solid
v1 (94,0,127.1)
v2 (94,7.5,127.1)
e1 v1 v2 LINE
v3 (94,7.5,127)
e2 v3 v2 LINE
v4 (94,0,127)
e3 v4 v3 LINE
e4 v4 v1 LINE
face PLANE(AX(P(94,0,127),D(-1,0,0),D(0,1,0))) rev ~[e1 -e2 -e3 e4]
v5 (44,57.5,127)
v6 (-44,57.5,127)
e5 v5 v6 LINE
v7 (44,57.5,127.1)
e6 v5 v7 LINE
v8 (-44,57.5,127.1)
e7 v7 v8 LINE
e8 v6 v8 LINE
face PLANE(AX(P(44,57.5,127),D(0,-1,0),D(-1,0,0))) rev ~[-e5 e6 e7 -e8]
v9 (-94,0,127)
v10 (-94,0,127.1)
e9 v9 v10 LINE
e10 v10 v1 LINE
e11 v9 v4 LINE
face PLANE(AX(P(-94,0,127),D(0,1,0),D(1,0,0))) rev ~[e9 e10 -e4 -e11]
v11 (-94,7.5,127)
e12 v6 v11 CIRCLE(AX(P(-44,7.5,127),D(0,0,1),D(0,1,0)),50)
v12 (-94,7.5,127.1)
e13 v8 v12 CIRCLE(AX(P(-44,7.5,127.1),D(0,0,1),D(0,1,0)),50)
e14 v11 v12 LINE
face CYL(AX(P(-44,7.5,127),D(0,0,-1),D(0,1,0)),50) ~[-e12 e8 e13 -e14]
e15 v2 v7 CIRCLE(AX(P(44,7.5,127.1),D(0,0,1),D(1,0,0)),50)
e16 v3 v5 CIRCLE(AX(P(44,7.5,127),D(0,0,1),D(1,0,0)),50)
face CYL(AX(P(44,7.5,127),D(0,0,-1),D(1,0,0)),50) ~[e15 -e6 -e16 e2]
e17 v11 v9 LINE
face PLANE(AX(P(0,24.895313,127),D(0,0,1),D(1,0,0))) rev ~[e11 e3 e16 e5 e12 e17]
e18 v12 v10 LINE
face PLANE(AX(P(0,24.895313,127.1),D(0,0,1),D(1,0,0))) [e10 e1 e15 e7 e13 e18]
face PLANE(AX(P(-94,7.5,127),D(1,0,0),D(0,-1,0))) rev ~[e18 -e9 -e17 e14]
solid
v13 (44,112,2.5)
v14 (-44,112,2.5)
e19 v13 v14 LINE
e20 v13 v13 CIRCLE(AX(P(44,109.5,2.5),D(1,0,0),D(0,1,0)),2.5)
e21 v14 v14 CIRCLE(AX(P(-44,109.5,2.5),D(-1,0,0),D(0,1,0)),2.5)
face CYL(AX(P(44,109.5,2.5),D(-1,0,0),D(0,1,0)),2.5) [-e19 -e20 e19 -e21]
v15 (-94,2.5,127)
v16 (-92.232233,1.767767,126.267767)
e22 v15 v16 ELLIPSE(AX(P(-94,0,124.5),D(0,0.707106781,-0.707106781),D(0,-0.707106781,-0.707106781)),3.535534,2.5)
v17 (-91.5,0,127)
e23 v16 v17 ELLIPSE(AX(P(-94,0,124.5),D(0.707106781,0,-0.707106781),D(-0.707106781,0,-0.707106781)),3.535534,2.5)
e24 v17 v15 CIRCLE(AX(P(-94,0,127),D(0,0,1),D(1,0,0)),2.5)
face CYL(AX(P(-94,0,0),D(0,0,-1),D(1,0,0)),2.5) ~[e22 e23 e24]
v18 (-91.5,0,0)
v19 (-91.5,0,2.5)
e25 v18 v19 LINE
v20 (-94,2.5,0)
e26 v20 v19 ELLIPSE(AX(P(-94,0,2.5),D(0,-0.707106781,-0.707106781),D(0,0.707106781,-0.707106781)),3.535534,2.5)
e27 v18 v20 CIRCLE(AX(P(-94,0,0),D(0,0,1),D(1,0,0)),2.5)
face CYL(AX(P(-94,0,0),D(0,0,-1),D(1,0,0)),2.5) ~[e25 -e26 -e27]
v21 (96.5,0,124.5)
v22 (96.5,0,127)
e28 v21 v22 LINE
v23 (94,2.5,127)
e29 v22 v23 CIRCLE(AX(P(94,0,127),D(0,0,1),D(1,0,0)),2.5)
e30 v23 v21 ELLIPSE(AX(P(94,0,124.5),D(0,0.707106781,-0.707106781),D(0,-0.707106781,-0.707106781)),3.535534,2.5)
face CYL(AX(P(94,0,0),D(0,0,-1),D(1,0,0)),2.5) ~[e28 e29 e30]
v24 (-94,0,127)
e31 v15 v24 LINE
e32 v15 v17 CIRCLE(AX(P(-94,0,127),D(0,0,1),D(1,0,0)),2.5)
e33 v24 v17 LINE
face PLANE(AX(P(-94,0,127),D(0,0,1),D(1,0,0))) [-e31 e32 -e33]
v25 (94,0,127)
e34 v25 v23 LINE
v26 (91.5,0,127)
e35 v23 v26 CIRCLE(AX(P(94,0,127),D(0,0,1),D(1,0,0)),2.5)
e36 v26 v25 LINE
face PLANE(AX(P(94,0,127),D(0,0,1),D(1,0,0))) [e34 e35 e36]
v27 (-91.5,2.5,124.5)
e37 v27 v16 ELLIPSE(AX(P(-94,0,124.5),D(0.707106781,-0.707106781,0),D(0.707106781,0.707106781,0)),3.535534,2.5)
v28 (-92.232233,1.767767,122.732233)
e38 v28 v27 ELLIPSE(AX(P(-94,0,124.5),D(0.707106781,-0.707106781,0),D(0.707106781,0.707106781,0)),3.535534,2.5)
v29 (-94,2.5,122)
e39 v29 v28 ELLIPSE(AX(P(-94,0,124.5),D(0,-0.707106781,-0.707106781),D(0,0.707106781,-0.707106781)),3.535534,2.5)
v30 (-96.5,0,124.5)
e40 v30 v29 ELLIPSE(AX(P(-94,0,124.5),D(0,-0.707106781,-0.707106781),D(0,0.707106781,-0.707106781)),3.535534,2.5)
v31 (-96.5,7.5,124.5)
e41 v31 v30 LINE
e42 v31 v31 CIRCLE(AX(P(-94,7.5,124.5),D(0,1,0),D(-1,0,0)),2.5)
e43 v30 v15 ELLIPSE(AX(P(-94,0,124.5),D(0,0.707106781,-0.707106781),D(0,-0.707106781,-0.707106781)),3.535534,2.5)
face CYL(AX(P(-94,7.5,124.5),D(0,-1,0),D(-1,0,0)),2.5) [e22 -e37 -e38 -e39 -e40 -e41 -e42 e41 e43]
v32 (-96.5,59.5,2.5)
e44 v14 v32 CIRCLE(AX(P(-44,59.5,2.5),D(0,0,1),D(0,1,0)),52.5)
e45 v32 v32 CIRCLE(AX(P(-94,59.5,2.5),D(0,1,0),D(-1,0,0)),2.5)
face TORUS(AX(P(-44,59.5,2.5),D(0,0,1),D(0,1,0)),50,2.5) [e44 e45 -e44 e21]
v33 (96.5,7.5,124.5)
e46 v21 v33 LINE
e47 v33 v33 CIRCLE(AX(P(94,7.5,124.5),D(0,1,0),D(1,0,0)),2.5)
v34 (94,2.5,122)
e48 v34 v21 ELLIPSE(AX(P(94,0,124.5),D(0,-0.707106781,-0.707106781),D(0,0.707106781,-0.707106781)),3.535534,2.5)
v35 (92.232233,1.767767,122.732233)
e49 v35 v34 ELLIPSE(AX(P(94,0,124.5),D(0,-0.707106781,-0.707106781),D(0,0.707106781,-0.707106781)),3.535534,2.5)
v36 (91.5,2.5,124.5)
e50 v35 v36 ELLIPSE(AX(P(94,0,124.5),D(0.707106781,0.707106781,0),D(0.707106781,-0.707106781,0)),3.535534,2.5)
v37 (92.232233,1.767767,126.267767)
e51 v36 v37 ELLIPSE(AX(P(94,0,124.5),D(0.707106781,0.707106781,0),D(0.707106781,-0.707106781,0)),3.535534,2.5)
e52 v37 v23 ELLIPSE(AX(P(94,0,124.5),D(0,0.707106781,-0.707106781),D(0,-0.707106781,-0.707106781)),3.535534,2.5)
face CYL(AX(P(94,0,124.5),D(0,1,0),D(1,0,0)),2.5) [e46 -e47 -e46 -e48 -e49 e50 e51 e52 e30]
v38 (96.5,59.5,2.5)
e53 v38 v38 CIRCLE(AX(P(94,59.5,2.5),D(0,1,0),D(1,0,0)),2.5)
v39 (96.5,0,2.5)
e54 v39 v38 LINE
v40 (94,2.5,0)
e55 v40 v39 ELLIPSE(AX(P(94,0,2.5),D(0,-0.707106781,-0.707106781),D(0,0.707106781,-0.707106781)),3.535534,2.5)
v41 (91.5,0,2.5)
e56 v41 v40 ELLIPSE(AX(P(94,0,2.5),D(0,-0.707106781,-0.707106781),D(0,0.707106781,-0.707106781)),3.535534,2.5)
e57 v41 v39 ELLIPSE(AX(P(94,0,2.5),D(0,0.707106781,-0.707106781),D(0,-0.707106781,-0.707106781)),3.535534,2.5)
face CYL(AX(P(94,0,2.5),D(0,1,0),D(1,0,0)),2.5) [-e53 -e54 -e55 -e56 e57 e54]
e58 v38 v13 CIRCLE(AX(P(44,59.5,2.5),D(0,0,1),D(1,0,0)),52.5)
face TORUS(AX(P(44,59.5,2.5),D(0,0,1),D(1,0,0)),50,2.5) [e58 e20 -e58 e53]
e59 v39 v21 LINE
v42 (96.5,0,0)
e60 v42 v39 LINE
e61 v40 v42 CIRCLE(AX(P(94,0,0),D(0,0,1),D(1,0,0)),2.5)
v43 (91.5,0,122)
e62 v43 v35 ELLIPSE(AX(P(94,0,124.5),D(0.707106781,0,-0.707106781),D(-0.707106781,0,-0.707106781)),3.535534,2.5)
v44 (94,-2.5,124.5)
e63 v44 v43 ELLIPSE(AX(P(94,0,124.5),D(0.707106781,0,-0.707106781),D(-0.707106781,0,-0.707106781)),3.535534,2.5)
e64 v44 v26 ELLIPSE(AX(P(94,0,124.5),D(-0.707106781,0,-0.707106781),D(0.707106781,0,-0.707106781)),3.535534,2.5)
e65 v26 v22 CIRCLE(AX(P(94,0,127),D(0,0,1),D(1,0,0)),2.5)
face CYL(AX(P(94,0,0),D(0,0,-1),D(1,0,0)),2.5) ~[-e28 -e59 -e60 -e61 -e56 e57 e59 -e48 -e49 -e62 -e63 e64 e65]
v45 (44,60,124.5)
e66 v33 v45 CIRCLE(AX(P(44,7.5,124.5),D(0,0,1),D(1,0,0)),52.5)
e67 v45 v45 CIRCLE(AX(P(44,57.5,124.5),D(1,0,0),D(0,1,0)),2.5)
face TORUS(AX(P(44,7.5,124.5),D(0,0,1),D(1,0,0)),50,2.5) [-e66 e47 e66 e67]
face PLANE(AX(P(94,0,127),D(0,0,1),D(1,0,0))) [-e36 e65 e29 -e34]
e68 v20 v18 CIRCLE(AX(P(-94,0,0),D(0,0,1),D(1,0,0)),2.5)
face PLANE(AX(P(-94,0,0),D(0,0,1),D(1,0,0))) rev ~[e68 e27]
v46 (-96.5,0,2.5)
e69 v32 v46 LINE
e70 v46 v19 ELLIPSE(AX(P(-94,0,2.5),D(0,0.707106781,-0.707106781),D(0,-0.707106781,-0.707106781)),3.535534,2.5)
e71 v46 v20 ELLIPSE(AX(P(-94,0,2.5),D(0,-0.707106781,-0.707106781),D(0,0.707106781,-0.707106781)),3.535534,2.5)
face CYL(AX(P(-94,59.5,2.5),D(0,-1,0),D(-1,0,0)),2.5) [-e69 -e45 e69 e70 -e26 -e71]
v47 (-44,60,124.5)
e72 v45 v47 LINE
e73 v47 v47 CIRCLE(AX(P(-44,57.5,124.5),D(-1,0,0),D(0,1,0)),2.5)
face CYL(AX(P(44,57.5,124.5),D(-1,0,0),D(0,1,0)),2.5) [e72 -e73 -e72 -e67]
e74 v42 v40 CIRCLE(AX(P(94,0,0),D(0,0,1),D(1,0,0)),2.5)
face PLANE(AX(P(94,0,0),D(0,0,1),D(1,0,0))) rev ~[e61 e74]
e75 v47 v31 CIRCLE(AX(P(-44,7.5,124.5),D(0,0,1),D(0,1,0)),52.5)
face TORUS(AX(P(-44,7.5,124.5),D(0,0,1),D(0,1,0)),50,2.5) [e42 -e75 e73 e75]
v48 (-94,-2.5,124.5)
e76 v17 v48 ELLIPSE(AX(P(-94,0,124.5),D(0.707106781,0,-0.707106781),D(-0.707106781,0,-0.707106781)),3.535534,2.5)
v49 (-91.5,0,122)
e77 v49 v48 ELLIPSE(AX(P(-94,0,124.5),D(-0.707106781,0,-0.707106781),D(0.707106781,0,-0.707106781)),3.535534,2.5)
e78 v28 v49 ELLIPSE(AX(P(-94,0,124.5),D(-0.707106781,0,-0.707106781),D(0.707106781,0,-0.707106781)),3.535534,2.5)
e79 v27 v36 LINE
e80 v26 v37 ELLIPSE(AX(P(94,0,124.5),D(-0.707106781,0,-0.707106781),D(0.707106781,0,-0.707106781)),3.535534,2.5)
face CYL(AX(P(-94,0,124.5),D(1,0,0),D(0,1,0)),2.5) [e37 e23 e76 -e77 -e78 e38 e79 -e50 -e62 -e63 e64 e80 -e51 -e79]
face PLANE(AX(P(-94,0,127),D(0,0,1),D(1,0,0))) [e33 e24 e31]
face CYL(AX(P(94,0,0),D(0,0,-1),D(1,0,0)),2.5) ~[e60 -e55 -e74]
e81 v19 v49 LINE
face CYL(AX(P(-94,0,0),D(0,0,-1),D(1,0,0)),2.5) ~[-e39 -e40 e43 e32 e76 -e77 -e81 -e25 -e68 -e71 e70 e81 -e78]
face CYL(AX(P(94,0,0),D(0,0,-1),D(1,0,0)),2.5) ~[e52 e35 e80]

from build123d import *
from build123d import SkipClean  # not in build123d's __all__

# Parameters (mm, degrees)
F0_R      = 2.5
F1_DEPTH  = 127
F5_R      = 2.5
F7_R      = 2.5
F11_R     = 2.5
F20_DEPTH = 0.1


# Not quite as in the source:
# - the program builds the solid bodies; features that only make, move or delete a surface that nothing else refers to are left out


with BuildPart() as f1:
    # F0 (on Top) → F1 (new body)
    with BuildSketch(Plane.XY):
        with Locations((94, 0)):
            Circle(F0_R)
    extrude(amount=F1_DEPTH)



with BuildPart() as f1b:
    # F0 (on Top) → F1, piece 2 (new body)
    with BuildSketch(Plane.XY):
        with Locations((-94, 0)):
            Circle(F0_R)
    extrude(amount=F1_DEPTH)


with BuildPart() as f1_1:
    add(f1.part, clean=False)

    add(f1b.part)  # F6 merges F1b
    # F6: sweep along a path in F3
    with BuildLine(Plane.XY.offset(124.5)) as f6_path:
        Line((-94, 0), (94, 0))
    # F5 (on offset) → F6 (sweep)
    with BuildSketch(Plane.YZ.offset(94)):
        with Locations((0, 124.5)):
            Circle(F5_R)
    sweep(path=f6_path.line)

    # F9: sweep along a path in F8
    with BuildLine(Plane.XY) as f9_path:
        Line((94, 0), (94, 59.5))
        ThreePointArc((94, 59.5), (79.3553390593, 94.8553390593), (44, 109.5))
        Line((44, 109.5), (-44, 109.5))
        ThreePointArc((-44, 109.5), (-79.3553390593, 94.8553390593), (-94, 59.5))
        Line((-94, 59.5), (-94, 0))
    # F7 (on Front) → F9 (sweep)
    with BuildSketch(Plane.XZ):
        with Locations((94, 2.5)):
            Circle(F7_R)
    sweep(path=f9_path.line)

    # F12: sweep along a path in F10
    with BuildLine(Plane.XY.offset(124.5)) as f12_path:
        Line((94, 0), (94, 7.5))
        ThreePointArc((94, 7.5), (79.3553390593, 42.8553390593), (44, 57.5))
        Line((44, 57.5), (-44, 57.5))
        ThreePointArc((-44, 57.5), (-79.3553390593, 42.8553390593), (-94, 7.5))
        Line((-94, 7.5), (-94, 0))
    # F11 (on Front) → F12 (sweep)
    with BuildSketch(Plane.XZ):
        with Locations((94, 124.5)):
            Circle(F11_R)
    with SkipClean():  # cleaning this boolean's faces spoils the solid; the shape is the same uncleaned
        sweep(path=f12_path.line)


with BuildPart() as f20:
    # F19 (on offset) → F20 (new body)
    with BuildSketch(Plane.XY.offset(127)):
        with BuildLine():
            Line((-94, 7.5), (-94, 0))
            Line((-94, 0), (94, 0))
            Line((94, 0), (94, 7.5))
            ThreePointArc((94, 7.5), (79.3553390593, 42.8553390593), (44, 57.5))
            Line((44, 57.5), (-44, 57.5))
            ThreePointArc((-44, 57.5), (-79.3553390593, 42.8553390593), (-94, 7.5))
        make_face()
    extrude(amount=F20_DEPTH)


solid = Compound([f1_1.part, f20.part])
